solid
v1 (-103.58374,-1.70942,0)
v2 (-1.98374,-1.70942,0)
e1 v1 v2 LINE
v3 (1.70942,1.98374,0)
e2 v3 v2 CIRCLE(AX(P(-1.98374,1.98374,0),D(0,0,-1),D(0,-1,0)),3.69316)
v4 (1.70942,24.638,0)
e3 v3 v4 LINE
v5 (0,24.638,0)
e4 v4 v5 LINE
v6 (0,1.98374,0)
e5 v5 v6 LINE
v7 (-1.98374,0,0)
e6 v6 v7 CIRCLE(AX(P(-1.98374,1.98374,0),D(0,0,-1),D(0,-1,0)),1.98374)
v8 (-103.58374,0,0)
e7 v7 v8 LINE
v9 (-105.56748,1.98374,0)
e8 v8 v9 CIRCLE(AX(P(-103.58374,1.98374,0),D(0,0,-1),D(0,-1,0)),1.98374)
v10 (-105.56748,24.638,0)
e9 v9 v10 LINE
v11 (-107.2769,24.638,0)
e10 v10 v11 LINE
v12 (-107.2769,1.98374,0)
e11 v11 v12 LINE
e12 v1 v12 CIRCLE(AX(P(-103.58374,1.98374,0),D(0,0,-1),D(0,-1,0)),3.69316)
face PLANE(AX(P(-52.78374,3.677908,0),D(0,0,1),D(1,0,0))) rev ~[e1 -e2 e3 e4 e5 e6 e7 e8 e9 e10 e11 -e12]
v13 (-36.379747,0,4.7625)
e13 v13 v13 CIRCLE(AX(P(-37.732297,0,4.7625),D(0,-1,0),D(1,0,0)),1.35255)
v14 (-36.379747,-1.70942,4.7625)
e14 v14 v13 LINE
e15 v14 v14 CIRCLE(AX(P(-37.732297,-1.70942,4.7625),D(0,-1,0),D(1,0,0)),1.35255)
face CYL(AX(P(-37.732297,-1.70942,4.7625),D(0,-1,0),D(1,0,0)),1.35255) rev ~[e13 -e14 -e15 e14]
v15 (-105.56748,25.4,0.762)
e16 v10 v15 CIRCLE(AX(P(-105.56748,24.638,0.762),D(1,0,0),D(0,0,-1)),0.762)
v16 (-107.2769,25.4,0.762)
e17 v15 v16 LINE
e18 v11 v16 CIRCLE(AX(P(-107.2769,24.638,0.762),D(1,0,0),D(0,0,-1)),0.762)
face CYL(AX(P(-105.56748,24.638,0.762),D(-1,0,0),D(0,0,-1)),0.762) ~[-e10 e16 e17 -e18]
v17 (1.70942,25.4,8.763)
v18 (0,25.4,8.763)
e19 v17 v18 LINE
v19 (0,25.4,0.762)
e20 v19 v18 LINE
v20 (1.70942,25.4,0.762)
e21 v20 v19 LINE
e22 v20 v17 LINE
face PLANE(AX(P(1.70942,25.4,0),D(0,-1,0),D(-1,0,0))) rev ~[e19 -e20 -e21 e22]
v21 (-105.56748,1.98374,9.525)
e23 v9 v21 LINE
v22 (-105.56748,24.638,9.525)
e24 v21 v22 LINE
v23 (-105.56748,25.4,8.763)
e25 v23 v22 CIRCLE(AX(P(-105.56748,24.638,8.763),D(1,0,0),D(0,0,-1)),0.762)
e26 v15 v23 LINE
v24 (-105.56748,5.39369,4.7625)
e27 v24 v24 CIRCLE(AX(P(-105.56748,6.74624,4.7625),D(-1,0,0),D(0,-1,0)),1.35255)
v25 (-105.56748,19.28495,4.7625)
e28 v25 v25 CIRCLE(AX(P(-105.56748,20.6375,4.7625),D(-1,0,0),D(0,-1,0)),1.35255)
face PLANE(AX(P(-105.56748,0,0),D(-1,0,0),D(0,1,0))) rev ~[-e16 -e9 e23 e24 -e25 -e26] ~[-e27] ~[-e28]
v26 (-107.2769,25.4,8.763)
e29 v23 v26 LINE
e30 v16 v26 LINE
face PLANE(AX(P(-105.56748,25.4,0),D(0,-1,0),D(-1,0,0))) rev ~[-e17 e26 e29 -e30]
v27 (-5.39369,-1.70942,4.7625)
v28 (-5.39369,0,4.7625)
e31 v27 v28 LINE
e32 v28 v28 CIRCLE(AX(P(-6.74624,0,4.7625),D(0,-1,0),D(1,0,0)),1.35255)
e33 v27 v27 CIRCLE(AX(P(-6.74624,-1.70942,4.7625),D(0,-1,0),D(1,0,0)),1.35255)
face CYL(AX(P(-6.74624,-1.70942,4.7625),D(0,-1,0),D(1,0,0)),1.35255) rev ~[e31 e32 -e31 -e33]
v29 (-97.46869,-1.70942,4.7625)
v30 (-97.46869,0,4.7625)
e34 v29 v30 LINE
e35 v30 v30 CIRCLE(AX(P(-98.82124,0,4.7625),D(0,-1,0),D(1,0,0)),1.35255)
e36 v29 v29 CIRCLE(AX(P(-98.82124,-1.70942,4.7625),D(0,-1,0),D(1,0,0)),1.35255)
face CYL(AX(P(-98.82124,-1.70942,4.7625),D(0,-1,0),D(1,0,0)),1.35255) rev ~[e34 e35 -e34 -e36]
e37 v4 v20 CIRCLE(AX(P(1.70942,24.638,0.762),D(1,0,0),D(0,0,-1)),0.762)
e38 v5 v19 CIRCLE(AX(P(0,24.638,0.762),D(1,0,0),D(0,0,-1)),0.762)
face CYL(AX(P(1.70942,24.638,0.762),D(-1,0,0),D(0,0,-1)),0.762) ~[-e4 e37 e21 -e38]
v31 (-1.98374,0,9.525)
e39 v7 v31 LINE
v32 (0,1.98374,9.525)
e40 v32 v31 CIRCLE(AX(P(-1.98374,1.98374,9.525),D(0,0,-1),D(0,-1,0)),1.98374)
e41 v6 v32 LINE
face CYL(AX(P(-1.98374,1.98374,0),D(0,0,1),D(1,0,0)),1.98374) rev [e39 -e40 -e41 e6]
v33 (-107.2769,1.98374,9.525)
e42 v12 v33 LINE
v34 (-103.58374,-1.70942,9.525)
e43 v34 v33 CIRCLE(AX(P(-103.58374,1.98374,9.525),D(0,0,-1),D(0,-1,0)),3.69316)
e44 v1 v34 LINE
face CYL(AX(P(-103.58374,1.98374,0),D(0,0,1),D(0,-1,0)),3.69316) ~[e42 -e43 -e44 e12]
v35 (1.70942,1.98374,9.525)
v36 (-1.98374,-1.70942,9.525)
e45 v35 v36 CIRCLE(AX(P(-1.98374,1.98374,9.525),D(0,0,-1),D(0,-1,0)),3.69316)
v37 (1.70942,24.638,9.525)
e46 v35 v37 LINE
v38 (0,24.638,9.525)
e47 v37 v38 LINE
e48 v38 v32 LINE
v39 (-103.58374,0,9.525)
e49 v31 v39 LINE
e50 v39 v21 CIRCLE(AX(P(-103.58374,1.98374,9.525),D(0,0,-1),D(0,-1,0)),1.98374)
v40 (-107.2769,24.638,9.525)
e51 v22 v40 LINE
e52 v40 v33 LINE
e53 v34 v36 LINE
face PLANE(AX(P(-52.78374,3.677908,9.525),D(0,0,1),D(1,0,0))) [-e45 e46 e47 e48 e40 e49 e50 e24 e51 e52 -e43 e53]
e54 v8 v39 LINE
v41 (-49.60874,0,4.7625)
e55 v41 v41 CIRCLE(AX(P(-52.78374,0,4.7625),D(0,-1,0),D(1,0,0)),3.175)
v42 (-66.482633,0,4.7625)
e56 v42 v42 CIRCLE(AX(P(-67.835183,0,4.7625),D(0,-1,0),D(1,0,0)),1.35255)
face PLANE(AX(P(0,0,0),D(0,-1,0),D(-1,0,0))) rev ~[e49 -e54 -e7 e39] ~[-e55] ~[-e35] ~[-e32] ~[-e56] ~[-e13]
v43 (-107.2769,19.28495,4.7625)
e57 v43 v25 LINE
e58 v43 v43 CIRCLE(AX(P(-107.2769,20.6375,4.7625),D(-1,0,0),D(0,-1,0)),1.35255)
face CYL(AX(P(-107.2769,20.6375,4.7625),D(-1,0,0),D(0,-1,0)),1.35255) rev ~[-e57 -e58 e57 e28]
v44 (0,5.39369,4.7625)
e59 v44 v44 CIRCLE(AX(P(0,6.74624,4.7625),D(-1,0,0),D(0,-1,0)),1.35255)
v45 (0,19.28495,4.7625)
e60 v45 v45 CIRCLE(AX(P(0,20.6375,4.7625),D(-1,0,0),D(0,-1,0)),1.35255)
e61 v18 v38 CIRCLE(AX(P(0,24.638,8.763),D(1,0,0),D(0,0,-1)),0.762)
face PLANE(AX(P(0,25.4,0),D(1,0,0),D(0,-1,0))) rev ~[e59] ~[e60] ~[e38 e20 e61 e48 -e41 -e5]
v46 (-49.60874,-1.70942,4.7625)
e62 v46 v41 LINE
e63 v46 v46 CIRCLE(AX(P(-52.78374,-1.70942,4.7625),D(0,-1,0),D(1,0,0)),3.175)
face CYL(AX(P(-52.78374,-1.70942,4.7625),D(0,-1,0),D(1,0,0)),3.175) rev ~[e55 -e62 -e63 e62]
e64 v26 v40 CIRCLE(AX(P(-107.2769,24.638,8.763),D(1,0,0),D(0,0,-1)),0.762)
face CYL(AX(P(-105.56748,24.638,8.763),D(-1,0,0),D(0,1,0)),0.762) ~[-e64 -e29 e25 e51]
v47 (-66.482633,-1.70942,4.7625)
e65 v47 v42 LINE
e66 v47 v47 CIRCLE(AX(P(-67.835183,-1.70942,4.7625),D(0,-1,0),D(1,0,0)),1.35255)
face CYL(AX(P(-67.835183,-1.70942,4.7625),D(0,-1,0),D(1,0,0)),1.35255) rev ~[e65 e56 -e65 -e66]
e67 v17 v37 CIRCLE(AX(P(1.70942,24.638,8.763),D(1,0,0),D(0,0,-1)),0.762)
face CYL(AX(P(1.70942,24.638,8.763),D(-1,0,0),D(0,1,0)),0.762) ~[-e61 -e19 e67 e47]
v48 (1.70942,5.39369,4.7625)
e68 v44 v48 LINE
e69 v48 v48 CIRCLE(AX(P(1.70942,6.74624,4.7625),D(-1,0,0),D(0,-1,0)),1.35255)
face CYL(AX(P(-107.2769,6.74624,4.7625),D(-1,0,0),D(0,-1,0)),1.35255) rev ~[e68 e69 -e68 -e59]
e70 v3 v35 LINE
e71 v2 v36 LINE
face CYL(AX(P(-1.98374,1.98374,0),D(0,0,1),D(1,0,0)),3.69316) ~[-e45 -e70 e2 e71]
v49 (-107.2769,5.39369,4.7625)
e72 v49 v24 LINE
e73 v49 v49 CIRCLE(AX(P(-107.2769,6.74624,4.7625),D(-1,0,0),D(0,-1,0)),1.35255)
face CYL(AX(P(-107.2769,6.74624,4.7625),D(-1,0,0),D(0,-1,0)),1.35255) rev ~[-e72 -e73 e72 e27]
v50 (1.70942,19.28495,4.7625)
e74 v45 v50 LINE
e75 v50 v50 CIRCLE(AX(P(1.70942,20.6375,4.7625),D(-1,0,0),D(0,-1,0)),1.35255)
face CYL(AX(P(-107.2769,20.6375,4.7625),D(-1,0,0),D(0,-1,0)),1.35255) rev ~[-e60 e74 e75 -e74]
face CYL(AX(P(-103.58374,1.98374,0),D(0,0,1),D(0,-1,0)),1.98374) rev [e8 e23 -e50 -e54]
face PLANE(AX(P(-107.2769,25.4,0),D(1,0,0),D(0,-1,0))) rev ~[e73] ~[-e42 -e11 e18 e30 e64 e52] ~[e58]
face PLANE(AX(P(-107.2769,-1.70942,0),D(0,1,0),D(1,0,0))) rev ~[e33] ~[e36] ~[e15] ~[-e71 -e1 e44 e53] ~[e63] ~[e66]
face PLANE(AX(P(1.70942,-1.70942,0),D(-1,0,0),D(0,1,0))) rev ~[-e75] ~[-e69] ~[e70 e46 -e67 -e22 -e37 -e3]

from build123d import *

# Parameters (mm, degrees)
F1_DEPTH = 9.525
F2_R     = 1.98374
F3_R     = 3.69316
F4_R     = 1.35255
F5_DEPTH = 108.98632
F6_R     = 1.35255
F6_R_2   = 3.175
F7_DEPTH = 1.70942
F8_R     = 0.762


with BuildPart() as f1:
    # F0 (on Top) → F1 (new body)
    with BuildSketch(Plane.XY):
        Polygon((0, 25.4), (0, 0), (-105.56748, 0), (-105.56748, 25.4), (-107.2769, 25.4), (-107.2769, -1.70942), (1.70942, -1.70942), (1.70942, 25.4), align=None)
    extrude(amount=F1_DEPTH)

    # F2
    f2_edges = [f1.edges().sort_by_distance(p)[0] for p in [
        (0, 0, 4.7625),
        (-105.56748, 0, 4.7625),
    ]]
    fillet(f2_edges, radius=F2_R)

    # F3
    f3_edges = [f1.edges().sort_by_distance(p)[0] for p in [
        (1.70942, -1.70942, 4.7625),
        (-107.2769, -1.70942, 4.7625),
    ]]
    fillet(f3_edges, radius=F3_R)

    # F4 (on face) → F5 (cut, through all)
    with BuildSketch(Plane(origin=(-107.2769, 0, 0), x_dir=(0, -1, 0), z_dir=(-1, 0, 0))):
        with Locations((-20.6375, 4.7625)):
            Circle(F4_R)
        with Locations((-6.74624, 4.7625)):
            Circle(F4_R)
    extrude(amount=-F5_DEPTH, mode=Mode.SUBTRACT)

    # F6 (on face) → F7 (cut, through all)
    with BuildSketch(Plane.XZ.offset(1.70942)):
        with Locations((-98.82124, 4.7625)):
            Circle(F6_R)
        with Locations((-6.74624, 4.7625)):
            Circle(F6_R)
        with Locations((-67.8351831, 4.7625)):
            Circle(F6_R)
        with Locations((-37.7322969, 4.7625)):
            Circle(F6_R)
        with Locations((-52.78374, 4.7625)):
            Circle(F6_R_2)
    extrude(amount=-F7_DEPTH, mode=Mode.SUBTRACT)

    # F8
    f8_edges = [f1.edges().sort_by_distance(p)[0] for p in [
        (-106.42219, 25.4, 9.525),
        (-106.42219, 25.4, 0),
        (0.85471, 25.4, 9.525),
        (0.85471, 25.4, 0),
    ]]
    fillet(f8_edges, radius=F8_R)


solid = f1.part
